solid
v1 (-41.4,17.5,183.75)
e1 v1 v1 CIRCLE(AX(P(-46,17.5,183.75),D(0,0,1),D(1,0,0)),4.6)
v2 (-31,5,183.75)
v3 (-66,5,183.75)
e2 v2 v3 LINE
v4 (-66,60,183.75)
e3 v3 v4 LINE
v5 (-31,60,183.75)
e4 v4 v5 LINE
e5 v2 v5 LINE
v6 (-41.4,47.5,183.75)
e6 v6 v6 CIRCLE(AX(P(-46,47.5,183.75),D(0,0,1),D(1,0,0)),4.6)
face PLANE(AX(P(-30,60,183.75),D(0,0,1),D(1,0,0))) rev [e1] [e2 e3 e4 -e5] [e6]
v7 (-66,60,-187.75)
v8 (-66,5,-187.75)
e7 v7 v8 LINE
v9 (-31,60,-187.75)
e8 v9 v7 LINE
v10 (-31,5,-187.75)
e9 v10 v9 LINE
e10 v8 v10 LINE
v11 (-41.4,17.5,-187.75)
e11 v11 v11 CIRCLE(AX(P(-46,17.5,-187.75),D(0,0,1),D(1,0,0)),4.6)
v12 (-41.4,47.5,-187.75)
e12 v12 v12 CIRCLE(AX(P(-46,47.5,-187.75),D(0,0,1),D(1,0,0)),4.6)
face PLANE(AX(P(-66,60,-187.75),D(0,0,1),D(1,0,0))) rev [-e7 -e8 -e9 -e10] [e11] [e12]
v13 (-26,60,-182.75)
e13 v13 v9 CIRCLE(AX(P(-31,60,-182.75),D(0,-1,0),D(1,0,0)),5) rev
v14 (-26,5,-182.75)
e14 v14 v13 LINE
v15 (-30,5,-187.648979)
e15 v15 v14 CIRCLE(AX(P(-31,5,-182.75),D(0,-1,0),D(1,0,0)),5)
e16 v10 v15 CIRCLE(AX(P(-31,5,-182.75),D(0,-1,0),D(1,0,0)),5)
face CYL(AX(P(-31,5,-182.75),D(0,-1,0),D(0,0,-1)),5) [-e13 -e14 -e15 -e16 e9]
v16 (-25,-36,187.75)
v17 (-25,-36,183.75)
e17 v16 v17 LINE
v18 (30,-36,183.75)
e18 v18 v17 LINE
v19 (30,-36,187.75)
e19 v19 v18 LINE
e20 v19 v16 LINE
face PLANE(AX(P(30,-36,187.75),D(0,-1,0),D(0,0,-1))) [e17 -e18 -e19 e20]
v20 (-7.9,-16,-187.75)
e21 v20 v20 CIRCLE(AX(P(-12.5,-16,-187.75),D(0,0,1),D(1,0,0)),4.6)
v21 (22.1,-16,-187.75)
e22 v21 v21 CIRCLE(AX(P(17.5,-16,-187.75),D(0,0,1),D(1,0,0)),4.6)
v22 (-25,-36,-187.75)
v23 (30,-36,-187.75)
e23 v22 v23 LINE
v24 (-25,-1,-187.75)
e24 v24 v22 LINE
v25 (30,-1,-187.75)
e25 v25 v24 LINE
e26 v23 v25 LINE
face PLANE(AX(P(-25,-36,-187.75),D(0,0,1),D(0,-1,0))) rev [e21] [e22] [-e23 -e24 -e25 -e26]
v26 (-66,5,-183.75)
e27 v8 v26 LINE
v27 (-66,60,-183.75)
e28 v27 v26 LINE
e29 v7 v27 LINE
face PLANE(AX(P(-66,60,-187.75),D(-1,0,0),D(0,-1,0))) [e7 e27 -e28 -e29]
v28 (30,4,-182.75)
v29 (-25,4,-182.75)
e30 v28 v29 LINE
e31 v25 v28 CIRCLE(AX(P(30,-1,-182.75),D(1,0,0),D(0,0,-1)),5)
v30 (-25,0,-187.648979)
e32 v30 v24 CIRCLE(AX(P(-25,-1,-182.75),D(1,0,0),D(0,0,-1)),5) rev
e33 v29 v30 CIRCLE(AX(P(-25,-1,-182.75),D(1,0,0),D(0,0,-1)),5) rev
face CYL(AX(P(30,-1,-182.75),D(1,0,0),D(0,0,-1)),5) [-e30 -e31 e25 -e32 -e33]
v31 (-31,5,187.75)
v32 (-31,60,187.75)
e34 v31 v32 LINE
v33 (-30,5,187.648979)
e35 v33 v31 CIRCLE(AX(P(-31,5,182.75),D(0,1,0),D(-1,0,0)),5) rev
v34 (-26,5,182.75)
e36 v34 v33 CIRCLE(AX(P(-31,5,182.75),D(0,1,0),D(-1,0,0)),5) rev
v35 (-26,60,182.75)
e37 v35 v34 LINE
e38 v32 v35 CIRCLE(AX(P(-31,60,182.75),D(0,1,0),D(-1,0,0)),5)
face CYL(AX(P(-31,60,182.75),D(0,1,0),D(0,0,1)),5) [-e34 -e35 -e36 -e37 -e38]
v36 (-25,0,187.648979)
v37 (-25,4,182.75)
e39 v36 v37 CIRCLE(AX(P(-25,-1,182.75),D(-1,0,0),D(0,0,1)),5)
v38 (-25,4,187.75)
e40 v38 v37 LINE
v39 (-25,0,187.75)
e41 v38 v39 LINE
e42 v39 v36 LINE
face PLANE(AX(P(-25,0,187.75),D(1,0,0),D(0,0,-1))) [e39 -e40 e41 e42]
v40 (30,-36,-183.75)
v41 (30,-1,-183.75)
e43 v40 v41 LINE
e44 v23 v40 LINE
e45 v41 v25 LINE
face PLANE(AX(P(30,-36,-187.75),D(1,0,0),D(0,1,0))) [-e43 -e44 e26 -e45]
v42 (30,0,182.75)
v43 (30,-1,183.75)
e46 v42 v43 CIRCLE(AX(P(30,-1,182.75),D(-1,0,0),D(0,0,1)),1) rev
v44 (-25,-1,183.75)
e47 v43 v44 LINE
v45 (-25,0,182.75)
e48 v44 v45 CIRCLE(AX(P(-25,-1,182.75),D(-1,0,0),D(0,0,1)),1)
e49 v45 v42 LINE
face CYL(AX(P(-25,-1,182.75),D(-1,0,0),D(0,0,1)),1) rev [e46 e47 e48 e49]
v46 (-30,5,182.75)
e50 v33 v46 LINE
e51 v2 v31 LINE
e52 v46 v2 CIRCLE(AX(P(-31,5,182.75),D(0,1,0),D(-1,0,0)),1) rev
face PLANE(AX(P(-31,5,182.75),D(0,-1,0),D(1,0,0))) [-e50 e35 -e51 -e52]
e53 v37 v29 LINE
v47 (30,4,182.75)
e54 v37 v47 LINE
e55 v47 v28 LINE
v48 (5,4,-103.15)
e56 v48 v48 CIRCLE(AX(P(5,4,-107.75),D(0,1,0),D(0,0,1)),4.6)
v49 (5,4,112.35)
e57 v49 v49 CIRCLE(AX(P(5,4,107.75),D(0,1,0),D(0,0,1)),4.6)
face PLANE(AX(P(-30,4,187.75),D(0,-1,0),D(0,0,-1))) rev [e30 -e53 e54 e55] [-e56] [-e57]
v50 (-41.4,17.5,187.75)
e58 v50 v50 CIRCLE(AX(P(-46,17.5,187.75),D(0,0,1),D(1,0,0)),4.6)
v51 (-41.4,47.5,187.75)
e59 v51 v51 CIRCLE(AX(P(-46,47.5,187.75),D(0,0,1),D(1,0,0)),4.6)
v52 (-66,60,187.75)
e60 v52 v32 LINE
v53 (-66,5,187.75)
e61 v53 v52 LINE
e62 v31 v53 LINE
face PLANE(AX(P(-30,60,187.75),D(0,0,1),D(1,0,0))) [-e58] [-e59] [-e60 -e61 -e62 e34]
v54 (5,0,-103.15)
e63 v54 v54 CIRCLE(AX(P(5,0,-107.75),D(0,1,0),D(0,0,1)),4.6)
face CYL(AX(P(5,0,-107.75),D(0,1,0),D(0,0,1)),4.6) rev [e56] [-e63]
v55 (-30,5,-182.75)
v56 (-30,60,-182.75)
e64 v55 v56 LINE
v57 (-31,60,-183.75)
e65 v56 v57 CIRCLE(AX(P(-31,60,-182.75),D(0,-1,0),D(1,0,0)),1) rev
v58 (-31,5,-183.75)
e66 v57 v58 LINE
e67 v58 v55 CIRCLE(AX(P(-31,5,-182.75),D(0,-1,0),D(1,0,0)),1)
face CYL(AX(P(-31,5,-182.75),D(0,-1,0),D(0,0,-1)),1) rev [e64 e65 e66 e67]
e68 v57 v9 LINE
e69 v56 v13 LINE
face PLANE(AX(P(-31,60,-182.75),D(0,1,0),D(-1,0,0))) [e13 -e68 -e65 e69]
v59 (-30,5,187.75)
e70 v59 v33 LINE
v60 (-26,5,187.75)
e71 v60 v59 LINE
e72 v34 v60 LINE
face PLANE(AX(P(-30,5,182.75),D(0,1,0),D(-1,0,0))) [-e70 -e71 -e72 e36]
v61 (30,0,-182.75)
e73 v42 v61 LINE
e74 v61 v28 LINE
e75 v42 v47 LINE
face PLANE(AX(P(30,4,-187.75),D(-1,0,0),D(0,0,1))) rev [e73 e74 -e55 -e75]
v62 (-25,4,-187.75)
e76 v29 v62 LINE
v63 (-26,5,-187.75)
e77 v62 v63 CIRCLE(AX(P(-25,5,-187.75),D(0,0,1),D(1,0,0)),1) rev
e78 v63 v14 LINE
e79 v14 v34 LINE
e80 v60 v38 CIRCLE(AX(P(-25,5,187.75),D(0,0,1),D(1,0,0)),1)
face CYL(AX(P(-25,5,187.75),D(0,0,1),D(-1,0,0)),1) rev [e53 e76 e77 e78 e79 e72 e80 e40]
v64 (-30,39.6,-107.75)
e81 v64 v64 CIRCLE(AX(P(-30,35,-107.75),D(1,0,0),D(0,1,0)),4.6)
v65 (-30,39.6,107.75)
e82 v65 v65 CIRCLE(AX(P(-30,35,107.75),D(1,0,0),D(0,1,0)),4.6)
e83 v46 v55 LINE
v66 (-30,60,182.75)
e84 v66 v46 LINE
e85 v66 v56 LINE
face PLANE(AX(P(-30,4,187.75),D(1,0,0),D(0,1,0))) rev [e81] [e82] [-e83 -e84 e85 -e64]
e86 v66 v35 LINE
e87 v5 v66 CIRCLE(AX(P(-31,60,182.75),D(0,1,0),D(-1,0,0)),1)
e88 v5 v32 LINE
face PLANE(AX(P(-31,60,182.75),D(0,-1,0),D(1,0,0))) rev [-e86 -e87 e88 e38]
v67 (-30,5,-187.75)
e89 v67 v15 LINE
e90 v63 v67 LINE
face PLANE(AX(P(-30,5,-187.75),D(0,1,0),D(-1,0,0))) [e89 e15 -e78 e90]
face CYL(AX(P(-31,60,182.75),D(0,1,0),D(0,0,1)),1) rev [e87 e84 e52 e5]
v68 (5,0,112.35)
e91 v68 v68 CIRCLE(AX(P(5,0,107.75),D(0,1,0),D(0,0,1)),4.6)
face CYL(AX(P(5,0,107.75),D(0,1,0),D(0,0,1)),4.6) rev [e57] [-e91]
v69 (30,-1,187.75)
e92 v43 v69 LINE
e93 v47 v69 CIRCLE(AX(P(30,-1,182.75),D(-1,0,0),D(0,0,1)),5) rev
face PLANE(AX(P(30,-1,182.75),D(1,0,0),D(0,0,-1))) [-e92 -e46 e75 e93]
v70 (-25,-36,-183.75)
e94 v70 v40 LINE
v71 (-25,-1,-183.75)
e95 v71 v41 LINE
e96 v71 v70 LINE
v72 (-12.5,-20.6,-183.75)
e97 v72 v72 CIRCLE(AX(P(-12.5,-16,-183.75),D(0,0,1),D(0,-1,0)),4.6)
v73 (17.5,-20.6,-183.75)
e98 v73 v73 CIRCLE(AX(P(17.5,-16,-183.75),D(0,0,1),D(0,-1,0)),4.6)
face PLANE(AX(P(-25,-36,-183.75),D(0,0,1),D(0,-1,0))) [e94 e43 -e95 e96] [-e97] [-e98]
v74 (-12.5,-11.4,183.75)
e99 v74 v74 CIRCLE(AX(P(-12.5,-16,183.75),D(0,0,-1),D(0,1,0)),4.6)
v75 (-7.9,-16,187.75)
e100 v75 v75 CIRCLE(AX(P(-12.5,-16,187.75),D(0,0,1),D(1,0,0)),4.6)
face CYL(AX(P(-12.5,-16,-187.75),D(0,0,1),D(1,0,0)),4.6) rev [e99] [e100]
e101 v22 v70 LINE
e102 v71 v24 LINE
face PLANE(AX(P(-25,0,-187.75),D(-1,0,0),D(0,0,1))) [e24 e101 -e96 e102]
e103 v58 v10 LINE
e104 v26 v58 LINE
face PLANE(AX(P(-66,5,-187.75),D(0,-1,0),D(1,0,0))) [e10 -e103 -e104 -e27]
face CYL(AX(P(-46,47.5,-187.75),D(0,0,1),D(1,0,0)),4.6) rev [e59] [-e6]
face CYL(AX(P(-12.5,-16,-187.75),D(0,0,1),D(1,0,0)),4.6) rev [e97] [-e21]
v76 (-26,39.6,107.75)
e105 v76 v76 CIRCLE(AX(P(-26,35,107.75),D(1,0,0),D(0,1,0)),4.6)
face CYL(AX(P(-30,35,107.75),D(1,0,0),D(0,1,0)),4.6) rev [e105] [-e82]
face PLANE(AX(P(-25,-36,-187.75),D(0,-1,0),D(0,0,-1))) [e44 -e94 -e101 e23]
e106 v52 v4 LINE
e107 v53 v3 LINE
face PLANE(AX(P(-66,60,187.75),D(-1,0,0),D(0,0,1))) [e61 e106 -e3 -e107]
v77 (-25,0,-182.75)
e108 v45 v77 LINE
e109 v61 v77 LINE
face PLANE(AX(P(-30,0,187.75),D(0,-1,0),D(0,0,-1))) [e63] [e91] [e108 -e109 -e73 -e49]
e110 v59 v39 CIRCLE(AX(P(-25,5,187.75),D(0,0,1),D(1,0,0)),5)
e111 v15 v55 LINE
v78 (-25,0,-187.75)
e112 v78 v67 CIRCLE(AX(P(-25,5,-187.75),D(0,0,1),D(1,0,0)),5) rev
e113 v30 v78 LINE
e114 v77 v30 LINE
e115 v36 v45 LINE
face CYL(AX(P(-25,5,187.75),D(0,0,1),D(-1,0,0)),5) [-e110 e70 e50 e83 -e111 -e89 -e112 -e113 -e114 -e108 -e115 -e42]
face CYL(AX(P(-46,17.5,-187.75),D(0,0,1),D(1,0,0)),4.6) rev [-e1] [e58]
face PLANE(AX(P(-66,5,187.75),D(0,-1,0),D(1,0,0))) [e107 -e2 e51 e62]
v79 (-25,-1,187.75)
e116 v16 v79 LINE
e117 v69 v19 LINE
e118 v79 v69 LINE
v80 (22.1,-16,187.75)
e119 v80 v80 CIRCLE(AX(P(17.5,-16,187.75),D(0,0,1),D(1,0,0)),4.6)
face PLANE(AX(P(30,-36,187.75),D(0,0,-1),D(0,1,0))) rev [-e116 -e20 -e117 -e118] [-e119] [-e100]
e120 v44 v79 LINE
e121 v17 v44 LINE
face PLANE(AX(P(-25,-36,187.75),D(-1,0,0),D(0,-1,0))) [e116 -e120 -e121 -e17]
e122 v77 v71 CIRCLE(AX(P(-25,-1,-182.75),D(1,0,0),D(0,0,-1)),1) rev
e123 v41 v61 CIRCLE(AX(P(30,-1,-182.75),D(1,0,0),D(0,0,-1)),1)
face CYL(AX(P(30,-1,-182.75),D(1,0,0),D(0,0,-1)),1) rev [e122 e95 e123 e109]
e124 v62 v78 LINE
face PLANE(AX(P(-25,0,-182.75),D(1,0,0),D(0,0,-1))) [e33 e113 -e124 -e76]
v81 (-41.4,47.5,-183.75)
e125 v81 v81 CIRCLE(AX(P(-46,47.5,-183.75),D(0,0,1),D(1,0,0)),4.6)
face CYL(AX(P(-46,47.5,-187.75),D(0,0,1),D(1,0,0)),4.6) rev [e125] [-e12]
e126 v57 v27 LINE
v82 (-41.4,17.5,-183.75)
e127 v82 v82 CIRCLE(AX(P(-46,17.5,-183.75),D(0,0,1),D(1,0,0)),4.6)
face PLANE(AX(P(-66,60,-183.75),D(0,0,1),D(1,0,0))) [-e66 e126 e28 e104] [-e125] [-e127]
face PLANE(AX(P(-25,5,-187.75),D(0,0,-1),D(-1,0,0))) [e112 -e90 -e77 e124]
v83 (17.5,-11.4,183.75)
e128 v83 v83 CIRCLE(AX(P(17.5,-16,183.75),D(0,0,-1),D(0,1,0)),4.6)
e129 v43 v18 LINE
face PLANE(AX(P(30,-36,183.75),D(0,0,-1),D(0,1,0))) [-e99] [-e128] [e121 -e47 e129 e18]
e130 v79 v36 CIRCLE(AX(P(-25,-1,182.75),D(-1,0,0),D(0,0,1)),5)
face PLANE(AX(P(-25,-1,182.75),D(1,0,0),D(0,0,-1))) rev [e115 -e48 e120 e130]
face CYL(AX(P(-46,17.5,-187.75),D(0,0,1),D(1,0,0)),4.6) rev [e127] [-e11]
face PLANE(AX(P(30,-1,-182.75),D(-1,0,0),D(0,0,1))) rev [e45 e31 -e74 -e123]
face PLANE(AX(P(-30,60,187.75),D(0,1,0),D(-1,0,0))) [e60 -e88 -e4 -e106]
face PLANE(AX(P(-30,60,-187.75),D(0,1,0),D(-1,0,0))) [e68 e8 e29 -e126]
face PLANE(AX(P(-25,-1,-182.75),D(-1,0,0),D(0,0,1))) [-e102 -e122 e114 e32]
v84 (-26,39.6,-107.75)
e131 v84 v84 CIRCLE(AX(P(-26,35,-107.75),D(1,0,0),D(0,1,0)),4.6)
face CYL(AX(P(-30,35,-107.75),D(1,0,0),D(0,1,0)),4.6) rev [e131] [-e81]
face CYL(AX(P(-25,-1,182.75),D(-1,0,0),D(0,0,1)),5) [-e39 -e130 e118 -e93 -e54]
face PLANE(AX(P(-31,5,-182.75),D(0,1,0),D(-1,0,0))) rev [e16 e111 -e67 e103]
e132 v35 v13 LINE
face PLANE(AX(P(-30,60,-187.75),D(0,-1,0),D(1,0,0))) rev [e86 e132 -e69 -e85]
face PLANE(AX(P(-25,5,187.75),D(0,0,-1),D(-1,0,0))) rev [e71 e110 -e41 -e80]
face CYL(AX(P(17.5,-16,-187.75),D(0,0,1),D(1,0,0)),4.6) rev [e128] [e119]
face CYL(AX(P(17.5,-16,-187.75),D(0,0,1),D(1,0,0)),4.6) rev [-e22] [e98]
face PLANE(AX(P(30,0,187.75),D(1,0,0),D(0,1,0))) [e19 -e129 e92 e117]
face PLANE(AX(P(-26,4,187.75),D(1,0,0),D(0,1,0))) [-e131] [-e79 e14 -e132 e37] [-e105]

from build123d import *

# Parameters (mm, degrees)
SKETCH1_W                      = 60
SKETCH1_H                      = 375.5
BASE_FLANGE1_DEPTH             = 4
EDGE_FLANGE1_STRIP_W           = 18
EDGE_FLANGE1_STRIP_H           = 4
EDGE_FLANGE1_STRIP_CUT_DEPTH   = 375.5
EDGE_FLANGE1_DEPTH             = 375.5
EDGE_FLANGE2_STRIP_W           = 18
EDGE_FLANGE2_STRIP_H           = 4
EDGE_FLANGE2_STRIP_CUT_DEPTH   = 55
EDGE_FLANGE2_STRIP_2_W         = 18
EDGE_FLANGE2_STRIP_2_H         = 4
EDGE_FLANGE2_STRIP_CUT_2_DEPTH = 55
EDGE_FLANGE2_STRIP_3_W         = 18
EDGE_FLANGE2_STRIP_3_H         = 4
EDGE_FLANGE2_STRIP_CUT_3_DEPTH = 55
EDGE_FLANGE2_STRIP_4_W         = 18
EDGE_FLANGE2_STRIP_4_H         = 4
EDGE_FLANGE2_STRIP_CUT_4_DEPTH = 55
EDGE_FLANGE2_DEPTH             = 55
EDGE_FLANGE2_BEND_DEPTH        = 55
EDGE_FLANGE2_BEND_2_DEPTH      = 55
EDGE_FLANGE2_BEND_3_DEPTH      = 55
SKETCH18_R                     = 4.6
EXTRUDE1_DEPTH                 = 386.948506928
SKETCH19_R                     = 4.6
EXTRUDE2_DEPTH                 = 4
SKETCH20_R                     = 4.6
EXTRUDE3_DEPTH                 = 4


# Sheet-metal steps are written as plain solids
with BuildPart() as part:
    # Sketch1 → Base-Flange1 (new body)
    with BuildSketch(Plane(origin=(0, 0, 0), x_dir=(1, 0, 0), z_dir=(0, 1, 0))):
        Rectangle(SKETCH1_W, SKETCH1_H)
    extrude(amount=BASE_FLANGE1_DEPTH)

    # Edge-Flange1 strip (across the edge) → Edge-Flange1 strip cut (cut)
    with BuildSketch(Plane(origin=(-30, 4, -187.75), x_dir=(1, 0, 0), z_dir=(0, 0, 1))):
        with Locations((-4, -2)):
            Rectangle(EDGE_FLANGE1_STRIP_W, EDGE_FLANGE1_STRIP_H)
    extrude(amount=EDGE_FLANGE1_STRIP_CUT_DEPTH, mode=Mode.SUBTRACT)

    # Edge-Flange1 section (across the edge) → Edge-Flange1 (add)
    with BuildSketch(Plane(origin=(-30, 4, -187.75), x_dir=(1, 0, 0), z_dir=(0, 0, 1))):
        with BuildLine():
            Line((0, 1), (0, 56))
            Line((0, 56), (4, 56))
            Line((4, 56), (4, 1))
            ThreePointArc((4, 1), (4.292893219, 0.292893219), (5, 0))
            Line((5, 0), (5, -4))
            ThreePointArc((5, -4), (1.464466094, -2.535533906), (0, 1))
        make_face()
    extrude(amount=EDGE_FLANGE1_DEPTH)

    # Edge-Flange2 strip (across the edge) → Edge-Flange2 strip cut (cut)
    with BuildSketch(Plane(origin=(-30, 5, 187.75), x_dir=(0, 0, -1), z_dir=(0, 1, 0))):
        with Locations((-4, -2)):
            Rectangle(EDGE_FLANGE2_STRIP_W, EDGE_FLANGE2_STRIP_H)
    extrude(amount=EDGE_FLANGE2_STRIP_CUT_DEPTH, mode=Mode.SUBTRACT)

    # Edge-Flange2 strip 2 (across the edge) → Edge-Flange2 strip cut 2 (cut)
    with BuildSketch(Plane(origin=(30, 0, 187.75), x_dir=(0, 0, -1), z_dir=(-1, 0, 0))):
        with Locations((-4, -2)):
            Rectangle(EDGE_FLANGE2_STRIP_2_W, EDGE_FLANGE2_STRIP_2_H)
    extrude(amount=EDGE_FLANGE2_STRIP_CUT_2_DEPTH, mode=Mode.SUBTRACT)

    # Edge-Flange2 strip 3 (across the edge) → Edge-Flange2 strip cut 3 (cut)
    with BuildSketch(Plane(origin=(-30, 60, -187.75), x_dir=(0, 0, 1), z_dir=(0, -1, 0))):
        with Locations((-4, -2)):
            Rectangle(EDGE_FLANGE2_STRIP_3_W, EDGE_FLANGE2_STRIP_3_H)
    extrude(amount=EDGE_FLANGE2_STRIP_CUT_3_DEPTH, mode=Mode.SUBTRACT)

    # Edge-Flange2 strip 4 (across the edge) → Edge-Flange2 strip cut 4 (cut)
    with BuildSketch(Plane(origin=(-25, 0, -187.75), x_dir=(0, 0, 1), z_dir=(1, 0, 0))):
        with Locations((-4, -2)):
            Rectangle(EDGE_FLANGE2_STRIP_4_W, EDGE_FLANGE2_STRIP_4_H)
    extrude(amount=EDGE_FLANGE2_STRIP_CUT_4_DEPTH, mode=Mode.SUBTRACT)

    # Edge-Flange2 section (across the edge) → Edge-Flange2 (add)
    with BuildSketch(Plane(origin=(-30, 5, 187.75), x_dir=(0, 0, -1), z_dir=(0, 1, 0))):
        with BuildLine():
            Line((0, 1), (0, 36))
            Line((0, 36), (4, 36))
            Line((4, 36), (4, 1))
            ThreePointArc((4, 1), (4.292893219, 0.292893219), (5, 0))
            Line((5, 0), (5, -4))
            ThreePointArc((5, -4), (1.464466094, -2.535533906), (0, 1))
        make_face()
    extrude(amount=EDGE_FLANGE2_DEPTH)

    # Edge-Flange2 section 2 (across the edge) → Edge-Flange2 bend (add)
    with BuildSketch(Plane(origin=(30, 0, 187.75), x_dir=(0, 0, -1), z_dir=(-1, 0, 0))):
        with BuildLine():
            Line((0, 1), (0, 36))
            Line((0, 36), (4, 36))
            Line((4, 36), (4, 1))
            ThreePointArc((4, 1), (4.292893219, 0.292893219), (5, 0))
            Line((5, 0), (5, -4))
            ThreePointArc((5, -4), (1.464466094, -2.535533906), (0, 1))
        make_face()
    extrude(amount=EDGE_FLANGE2_BEND_DEPTH)

    # Edge-Flange2 section 3 (across the edge) → Edge-Flange2 bend 2 (add)
    with BuildSketch(Plane(origin=(-30, 60, -187.75), x_dir=(0, 0, 1), z_dir=(0, -1, 0))):
        with BuildLine():
            Line((0, 1), (0, 36))
            Line((0, 36), (4, 36))
            Line((4, 36), (4, 1))
            ThreePointArc((4, 1), (4.292893219, 0.292893219), (5, 0))
            Line((5, 0), (5, -4))
            ThreePointArc((5, -4), (1.464466094, -2.535533906), (0, 1))
        make_face()
    extrude(amount=EDGE_FLANGE2_BEND_2_DEPTH)

    # Edge-Flange2 section 4 (across the edge) → Edge-Flange2 bend 3 (add)
    with BuildSketch(Plane(origin=(-25, 0, -187.75), x_dir=(0, 0, 1), z_dir=(1, 0, 0))):
        with BuildLine():
            Line((0, 1), (0, 36))
            Line((0, 36), (4, 36))
            Line((4, 36), (4, 1))
            ThreePointArc((4, 1), (4.292893219, 0.292893219), (5, 0))
            Line((5, 0), (5, -4))
            ThreePointArc((5, -4), (1.464466094, -2.535533906), (0, 1))
        make_face()
    extrude(amount=EDGE_FLANGE2_BEND_3_DEPTH)

    # Sketch18 → Extrude1 (cut, through all)
    with BuildSketch(Plane.XY.offset(187.75)):
        with Locations((-46, 47.5)):
            Circle(SKETCH18_R)
        with Locations((-46, 17.5)):
            Circle(SKETCH18_R)
        with Locations((-12.5, -16)):
            Circle(SKETCH18_R)
        with Locations((17.5, -16)):
            Circle(SKETCH18_R)
    extrude(amount=-EXTRUDE1_DEPTH, mode=Mode.SUBTRACT)

    # Sketch19 → Extrude2 (cut)
    with BuildSketch(Plane(origin=(-26, 0, 0), x_dir=(0, 0, -1), z_dir=(1, 0, 0))):
        with Locations(Location((-107.75, 35, 0), (0, 0, 90))):
            Circle(SKETCH19_R)
        with Locations(Location((107.75, 35, 0), (0, 0, 90))):
            Circle(SKETCH19_R)
    extrude(amount=-EXTRUDE2_DEPTH, mode=Mode.SUBTRACT)

    # Sketch20 → Extrude3 (cut)
    with BuildSketch(Plane(origin=(0, 4, 0), x_dir=(1, 0, 0), z_dir=(0, 1, 0))):
        with Locations(Location((5, 107.75, 0), (0, 0, 270))):
            Circle(SKETCH20_R)
        with Locations(Location((5, -107.75, 0), (0, 0, 270))):
            Circle(SKETCH20_R)
    extrude(amount=-EXTRUDE3_DEPTH, mode=Mode.SUBTRACT)


solid = part.part
